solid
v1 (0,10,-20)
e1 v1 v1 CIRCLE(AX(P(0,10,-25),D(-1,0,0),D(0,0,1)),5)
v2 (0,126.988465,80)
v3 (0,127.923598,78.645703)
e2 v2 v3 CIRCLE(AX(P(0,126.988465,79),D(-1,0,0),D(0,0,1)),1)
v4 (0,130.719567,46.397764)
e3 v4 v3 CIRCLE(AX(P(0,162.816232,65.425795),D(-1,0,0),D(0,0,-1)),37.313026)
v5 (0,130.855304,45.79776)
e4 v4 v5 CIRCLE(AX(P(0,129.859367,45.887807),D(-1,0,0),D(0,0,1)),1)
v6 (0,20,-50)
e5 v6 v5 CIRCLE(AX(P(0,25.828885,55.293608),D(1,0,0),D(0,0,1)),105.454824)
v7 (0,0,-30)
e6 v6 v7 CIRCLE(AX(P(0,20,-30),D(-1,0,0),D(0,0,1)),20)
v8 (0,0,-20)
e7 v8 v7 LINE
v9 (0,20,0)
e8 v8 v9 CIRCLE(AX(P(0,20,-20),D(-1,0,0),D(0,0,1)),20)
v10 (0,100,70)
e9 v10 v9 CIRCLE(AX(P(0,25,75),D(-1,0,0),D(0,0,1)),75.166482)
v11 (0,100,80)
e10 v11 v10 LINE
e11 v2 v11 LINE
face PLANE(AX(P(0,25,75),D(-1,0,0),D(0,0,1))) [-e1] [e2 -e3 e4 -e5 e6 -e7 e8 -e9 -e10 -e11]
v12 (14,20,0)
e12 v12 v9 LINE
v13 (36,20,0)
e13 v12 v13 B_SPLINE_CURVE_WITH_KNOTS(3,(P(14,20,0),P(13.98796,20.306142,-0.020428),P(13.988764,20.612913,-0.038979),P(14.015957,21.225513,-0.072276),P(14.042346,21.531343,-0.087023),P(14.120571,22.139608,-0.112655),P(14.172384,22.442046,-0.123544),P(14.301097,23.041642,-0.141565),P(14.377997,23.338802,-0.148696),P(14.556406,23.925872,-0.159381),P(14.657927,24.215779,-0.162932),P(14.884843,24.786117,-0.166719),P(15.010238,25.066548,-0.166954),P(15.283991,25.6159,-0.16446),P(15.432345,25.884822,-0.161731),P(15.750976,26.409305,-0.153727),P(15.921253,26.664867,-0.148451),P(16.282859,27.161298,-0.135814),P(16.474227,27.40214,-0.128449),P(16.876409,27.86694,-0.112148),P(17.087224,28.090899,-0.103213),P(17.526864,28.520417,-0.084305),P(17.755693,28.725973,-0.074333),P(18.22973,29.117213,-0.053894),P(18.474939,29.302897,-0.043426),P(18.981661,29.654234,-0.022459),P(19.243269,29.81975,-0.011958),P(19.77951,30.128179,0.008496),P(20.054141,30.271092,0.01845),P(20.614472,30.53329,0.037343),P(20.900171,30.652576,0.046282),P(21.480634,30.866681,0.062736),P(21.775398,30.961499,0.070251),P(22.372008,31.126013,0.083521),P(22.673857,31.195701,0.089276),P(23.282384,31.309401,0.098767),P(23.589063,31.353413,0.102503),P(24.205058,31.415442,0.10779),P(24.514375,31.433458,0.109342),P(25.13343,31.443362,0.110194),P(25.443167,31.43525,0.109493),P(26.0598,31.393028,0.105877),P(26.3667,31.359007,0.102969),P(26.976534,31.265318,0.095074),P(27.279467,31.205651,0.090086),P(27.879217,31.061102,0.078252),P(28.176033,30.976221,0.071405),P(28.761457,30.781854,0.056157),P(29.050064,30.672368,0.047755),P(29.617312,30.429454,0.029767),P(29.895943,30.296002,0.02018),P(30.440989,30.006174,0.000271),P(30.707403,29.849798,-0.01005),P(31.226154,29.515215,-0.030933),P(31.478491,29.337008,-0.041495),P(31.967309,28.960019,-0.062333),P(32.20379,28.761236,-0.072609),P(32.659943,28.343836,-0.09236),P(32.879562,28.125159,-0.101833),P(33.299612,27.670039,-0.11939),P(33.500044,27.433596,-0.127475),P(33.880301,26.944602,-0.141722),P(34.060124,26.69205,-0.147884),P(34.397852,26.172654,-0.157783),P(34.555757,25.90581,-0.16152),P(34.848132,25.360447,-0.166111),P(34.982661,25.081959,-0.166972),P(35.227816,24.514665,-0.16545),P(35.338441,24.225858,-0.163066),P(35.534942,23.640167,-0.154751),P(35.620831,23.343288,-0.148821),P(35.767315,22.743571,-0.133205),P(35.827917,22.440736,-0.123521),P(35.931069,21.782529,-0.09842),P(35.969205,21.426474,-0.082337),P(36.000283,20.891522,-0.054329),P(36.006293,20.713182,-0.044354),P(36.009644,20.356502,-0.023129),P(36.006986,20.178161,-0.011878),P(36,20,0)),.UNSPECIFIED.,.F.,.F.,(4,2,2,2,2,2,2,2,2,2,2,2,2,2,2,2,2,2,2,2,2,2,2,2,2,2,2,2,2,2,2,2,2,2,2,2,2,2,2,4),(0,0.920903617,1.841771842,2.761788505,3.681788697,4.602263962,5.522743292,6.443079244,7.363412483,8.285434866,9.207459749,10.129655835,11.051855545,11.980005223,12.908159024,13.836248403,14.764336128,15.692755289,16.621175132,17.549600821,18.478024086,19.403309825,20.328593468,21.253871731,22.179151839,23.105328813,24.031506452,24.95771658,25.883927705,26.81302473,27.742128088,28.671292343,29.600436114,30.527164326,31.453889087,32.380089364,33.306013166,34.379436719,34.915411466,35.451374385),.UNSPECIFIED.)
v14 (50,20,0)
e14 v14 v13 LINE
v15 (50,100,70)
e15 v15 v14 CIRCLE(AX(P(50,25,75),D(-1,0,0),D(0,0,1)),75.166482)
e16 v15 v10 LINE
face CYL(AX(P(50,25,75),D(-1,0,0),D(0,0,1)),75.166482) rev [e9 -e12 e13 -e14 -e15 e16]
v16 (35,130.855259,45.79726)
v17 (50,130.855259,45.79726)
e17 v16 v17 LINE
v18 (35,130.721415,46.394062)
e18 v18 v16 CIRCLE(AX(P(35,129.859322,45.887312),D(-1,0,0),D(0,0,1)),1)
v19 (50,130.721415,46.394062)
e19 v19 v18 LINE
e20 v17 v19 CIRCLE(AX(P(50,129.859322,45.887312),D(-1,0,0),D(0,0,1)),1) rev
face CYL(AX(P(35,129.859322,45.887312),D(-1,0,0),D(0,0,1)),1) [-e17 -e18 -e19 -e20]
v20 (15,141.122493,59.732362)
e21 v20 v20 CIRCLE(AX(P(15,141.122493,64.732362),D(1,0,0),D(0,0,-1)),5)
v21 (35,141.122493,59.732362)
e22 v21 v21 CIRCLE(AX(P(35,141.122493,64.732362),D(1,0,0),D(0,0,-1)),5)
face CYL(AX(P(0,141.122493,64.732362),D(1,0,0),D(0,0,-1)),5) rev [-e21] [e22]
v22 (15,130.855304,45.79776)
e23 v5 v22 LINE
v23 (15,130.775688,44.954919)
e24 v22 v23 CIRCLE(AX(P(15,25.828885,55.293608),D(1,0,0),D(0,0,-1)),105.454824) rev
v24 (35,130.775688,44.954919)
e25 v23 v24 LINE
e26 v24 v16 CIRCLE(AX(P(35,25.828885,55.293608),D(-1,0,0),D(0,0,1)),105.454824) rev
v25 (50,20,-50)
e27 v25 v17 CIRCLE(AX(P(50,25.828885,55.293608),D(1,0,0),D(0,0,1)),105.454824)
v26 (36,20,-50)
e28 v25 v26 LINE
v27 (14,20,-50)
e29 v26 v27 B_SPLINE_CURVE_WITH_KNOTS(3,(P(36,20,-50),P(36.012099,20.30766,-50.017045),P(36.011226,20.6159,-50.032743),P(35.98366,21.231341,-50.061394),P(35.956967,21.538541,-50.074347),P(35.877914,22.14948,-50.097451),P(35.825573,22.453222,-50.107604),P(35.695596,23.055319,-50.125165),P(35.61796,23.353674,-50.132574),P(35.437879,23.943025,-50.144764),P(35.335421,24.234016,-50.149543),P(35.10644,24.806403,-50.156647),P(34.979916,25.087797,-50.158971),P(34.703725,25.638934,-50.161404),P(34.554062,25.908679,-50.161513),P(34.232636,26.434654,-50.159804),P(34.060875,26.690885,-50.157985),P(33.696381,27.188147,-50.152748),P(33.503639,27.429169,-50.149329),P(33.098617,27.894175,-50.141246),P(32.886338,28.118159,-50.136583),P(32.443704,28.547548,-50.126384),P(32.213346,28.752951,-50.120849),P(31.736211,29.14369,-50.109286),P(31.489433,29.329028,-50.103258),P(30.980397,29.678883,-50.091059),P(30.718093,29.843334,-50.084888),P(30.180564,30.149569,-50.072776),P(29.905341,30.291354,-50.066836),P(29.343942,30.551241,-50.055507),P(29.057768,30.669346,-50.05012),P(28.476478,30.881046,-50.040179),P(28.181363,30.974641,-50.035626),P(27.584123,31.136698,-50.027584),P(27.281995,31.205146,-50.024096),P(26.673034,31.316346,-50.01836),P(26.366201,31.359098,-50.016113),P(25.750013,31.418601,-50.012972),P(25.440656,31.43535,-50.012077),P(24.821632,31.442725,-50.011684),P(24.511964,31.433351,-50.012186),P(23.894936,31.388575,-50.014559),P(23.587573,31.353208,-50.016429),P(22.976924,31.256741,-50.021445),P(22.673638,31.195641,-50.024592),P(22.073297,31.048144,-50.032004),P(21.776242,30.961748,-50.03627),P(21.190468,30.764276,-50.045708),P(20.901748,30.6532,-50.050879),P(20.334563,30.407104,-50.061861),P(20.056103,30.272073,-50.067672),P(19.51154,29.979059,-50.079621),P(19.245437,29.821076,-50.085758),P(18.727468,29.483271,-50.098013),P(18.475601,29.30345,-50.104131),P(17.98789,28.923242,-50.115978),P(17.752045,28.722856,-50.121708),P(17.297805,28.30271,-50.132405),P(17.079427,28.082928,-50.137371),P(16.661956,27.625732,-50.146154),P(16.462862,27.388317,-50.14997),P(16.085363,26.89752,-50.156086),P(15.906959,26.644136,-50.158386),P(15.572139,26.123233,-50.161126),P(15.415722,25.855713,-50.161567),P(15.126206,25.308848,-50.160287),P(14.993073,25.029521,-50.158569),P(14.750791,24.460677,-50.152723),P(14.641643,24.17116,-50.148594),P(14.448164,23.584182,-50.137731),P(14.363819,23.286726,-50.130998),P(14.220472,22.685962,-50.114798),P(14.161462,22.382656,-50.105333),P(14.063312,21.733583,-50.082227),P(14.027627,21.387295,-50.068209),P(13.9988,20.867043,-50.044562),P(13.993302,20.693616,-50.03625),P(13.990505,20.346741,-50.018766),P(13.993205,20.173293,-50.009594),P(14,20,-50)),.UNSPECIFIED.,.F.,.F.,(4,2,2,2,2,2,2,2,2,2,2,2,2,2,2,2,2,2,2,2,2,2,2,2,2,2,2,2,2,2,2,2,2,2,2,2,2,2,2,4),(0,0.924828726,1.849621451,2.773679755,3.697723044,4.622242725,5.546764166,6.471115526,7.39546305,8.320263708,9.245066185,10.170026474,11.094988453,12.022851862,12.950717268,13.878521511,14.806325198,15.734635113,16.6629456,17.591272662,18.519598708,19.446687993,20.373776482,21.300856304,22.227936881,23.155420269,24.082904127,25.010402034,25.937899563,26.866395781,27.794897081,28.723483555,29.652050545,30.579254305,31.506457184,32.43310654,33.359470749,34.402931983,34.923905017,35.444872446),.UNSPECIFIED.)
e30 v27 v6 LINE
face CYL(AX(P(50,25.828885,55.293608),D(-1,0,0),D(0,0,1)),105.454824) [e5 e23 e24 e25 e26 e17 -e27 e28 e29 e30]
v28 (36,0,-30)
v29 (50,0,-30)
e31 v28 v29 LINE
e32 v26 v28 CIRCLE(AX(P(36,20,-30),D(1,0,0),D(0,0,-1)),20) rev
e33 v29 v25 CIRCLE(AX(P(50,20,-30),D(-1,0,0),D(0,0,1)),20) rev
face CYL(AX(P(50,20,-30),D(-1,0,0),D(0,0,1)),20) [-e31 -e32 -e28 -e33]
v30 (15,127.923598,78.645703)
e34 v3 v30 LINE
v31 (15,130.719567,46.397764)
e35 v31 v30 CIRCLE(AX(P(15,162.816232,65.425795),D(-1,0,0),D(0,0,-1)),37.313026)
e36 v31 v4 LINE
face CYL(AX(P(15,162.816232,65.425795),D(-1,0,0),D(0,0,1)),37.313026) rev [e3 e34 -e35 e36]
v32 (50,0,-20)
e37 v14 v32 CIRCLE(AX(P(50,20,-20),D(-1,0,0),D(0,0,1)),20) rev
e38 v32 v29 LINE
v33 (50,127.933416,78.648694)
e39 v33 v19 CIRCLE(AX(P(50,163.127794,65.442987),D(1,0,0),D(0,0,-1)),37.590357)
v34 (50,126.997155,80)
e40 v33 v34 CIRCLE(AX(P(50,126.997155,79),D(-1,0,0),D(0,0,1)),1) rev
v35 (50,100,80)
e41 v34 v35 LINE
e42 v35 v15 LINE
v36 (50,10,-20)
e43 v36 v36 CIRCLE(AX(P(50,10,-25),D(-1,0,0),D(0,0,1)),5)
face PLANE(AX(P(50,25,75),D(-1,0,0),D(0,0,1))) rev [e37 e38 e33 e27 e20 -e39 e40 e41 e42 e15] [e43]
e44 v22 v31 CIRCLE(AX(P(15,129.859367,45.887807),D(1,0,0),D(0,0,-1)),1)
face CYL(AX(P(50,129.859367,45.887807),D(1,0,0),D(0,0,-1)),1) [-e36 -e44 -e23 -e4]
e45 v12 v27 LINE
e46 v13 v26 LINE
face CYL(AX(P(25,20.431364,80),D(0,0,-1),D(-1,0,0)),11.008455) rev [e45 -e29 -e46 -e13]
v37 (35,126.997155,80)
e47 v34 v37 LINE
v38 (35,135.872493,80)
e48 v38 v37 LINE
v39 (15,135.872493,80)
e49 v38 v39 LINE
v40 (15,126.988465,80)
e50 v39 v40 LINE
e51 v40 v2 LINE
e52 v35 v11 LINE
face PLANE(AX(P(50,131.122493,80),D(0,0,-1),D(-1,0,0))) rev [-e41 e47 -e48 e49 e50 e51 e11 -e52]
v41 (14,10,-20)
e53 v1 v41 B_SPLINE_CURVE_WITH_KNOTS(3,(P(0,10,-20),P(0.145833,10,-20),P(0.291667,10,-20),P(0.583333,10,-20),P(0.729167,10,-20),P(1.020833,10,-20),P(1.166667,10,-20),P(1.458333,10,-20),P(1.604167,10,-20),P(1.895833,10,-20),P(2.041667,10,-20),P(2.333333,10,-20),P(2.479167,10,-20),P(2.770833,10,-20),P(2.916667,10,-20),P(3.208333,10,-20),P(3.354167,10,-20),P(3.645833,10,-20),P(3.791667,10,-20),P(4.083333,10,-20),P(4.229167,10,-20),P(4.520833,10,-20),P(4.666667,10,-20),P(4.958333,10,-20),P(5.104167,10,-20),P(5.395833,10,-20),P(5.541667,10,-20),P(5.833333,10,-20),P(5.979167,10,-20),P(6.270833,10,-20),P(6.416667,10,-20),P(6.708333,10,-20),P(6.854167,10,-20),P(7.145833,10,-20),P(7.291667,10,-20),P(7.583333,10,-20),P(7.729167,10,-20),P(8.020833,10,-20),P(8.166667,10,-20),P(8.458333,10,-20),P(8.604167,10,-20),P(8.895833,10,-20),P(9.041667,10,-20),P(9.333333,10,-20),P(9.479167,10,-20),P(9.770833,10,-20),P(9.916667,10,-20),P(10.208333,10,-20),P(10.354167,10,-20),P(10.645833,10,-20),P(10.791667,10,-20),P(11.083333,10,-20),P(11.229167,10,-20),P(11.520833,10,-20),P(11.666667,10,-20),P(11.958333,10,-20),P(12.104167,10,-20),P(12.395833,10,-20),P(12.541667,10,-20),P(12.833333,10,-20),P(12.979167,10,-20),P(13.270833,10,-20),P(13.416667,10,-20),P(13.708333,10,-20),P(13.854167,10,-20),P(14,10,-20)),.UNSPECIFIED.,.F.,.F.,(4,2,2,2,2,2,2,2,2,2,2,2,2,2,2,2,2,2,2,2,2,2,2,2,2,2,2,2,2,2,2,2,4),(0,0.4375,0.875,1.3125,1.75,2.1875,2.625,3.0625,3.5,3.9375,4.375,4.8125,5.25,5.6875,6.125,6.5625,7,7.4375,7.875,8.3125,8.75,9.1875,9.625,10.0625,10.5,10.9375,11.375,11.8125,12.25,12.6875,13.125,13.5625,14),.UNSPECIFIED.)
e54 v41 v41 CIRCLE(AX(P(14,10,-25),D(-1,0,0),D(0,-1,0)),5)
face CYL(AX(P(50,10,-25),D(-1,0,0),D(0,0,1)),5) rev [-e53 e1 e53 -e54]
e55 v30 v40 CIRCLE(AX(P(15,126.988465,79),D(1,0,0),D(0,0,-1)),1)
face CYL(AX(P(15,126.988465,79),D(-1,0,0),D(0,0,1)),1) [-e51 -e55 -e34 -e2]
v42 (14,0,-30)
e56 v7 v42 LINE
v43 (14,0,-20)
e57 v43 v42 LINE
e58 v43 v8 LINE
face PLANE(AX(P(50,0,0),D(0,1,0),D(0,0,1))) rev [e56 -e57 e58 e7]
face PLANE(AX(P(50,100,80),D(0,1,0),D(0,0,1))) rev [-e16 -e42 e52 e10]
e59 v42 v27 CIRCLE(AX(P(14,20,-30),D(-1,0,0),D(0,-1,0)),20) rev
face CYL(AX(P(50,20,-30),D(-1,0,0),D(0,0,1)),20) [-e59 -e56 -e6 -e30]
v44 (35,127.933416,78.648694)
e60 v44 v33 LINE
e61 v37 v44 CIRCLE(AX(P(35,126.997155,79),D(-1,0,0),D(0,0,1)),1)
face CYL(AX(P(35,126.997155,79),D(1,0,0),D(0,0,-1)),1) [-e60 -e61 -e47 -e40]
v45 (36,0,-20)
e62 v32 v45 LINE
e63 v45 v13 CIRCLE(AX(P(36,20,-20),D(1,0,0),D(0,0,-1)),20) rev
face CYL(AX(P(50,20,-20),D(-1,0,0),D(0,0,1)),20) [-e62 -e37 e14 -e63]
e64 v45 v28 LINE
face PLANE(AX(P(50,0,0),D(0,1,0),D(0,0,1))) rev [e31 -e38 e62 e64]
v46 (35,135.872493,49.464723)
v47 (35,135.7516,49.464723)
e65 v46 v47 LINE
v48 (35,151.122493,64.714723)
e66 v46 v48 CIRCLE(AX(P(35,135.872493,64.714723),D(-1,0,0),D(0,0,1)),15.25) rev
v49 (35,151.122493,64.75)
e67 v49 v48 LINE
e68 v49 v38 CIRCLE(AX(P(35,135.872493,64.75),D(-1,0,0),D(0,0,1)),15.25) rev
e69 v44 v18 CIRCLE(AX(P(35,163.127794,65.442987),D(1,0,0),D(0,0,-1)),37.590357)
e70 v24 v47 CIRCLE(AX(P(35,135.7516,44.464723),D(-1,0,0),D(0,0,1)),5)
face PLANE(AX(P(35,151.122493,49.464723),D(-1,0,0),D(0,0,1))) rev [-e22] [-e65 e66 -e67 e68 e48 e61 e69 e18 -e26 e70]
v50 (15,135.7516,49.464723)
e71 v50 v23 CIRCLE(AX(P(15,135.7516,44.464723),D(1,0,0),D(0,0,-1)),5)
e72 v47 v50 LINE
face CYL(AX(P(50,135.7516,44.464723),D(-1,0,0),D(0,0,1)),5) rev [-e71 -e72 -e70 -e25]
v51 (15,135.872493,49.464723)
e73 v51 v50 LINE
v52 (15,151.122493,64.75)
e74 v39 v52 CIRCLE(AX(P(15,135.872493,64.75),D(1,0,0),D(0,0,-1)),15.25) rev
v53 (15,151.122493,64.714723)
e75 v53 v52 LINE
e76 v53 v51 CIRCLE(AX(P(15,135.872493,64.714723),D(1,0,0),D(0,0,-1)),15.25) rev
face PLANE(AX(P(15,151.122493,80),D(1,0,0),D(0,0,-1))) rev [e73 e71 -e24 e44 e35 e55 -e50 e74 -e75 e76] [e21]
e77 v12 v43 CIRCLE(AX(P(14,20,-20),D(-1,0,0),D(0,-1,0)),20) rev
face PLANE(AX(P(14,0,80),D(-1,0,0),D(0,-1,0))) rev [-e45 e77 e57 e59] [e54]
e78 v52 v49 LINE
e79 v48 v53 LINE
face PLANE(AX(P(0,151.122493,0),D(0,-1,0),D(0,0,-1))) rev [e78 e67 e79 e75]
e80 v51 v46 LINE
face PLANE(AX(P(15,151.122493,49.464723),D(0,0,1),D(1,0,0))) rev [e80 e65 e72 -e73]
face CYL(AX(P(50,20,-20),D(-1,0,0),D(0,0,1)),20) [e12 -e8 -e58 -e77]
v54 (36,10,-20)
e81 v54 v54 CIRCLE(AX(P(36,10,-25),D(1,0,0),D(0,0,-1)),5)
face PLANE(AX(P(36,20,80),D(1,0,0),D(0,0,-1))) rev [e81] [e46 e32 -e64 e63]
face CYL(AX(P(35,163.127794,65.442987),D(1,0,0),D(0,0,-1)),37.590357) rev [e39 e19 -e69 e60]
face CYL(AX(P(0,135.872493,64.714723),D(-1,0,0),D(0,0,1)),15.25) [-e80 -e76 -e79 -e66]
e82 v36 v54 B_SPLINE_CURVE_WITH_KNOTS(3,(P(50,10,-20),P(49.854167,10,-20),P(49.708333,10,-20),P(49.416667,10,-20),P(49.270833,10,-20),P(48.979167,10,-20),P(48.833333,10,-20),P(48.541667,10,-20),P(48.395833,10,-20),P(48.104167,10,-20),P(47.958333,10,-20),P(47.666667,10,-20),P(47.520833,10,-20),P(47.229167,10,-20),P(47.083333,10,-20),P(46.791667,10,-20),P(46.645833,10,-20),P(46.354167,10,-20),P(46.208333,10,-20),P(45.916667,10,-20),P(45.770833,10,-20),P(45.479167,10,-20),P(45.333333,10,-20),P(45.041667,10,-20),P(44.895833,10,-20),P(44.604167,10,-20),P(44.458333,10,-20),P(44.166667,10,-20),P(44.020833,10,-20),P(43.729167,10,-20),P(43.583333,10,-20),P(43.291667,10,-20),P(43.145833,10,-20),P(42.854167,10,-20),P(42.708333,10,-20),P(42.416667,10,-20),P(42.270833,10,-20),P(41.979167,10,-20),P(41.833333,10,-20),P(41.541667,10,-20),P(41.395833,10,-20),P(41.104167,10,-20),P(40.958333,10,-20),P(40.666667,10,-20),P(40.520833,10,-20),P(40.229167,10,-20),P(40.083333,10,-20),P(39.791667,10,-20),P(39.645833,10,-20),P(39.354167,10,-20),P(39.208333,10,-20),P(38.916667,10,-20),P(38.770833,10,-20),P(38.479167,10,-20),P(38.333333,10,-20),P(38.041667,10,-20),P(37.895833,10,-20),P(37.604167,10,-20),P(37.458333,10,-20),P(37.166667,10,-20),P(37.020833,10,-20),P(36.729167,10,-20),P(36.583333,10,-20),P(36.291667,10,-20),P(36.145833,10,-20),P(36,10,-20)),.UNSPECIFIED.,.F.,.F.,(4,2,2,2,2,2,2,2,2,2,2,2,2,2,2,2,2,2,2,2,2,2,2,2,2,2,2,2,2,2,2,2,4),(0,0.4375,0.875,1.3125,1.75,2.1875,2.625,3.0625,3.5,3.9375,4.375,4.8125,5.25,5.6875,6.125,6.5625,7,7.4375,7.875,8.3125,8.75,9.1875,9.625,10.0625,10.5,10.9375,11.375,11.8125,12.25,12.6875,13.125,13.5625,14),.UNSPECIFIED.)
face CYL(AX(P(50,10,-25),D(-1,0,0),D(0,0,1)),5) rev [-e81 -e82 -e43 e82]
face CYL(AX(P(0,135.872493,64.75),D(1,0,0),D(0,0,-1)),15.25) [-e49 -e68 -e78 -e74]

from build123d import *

# Parameters (mm, degrees)
BOSS_EXTRUDE1_DEPTH     = 50
SKETCH3_W               = 22
SKETCH3_H               = 20
CUT_EXTRUDE2_DEPTH      = 192.293252092
CUT_EXTRUDE3_DEPTH      = 158.762822921
CUT_EXTRUDE3_DEPTH_BACK = 158.762822921
SKETCH4_R               = 5
FILLET3_R               = 20
CUT_EXTRUDE4_DEPTH      = 162.533613518
CUT_EXTRUDE4_DEPTH_BACK = 162.533613518
SKETCH6_W               = 20
SKETCH6_H               = 30.53527662
BOSS_EXTRUDE2_DEPTH     = 20
SKETCH7_R               = 5
CUT_EXTRUDE5_DEPTH      = 175.536552167
FILLET4_R               = 15.25
FILLET8_R               = 5
CUT_EXTRUDE7_START      = -15
CUT_EXTRUDE7_DEPTH      = 15
CUT_EXTRUDE8_DEPTH      = 15
FILLET13_R              = 1


with BuildPart() as part:
    # Sketch2 → Boss-Extrude1 (new body)
    with BuildSketch(Plane(origin=(0, 0, 0), x_dir=(0, 0, -1), z_dir=(1, 0, 0))):
        with BuildLine():
            Line((0, 0), (50, 0))
            Line((50, 0), (50, 20))
            ThreePointArc((50, 20), (23.281860252, 96.16106544), (-49.46472338, 131.122493479))
            Line((-49.46472338, 131.122493479), (-80, 131.122493479))
            Line((-80, 131.122493479), (-80, 100))
            Line((-80, 100), (-70, 100))
            ThreePointArc((-70, 100), (-18.431457505, 74.497474683), (0, 20))
            Line((0, 20), (0, 0))
        make_face()
    extrude(amount=BOSS_EXTRUDE1_DEPTH)

    # Sketch3 → Cut-Extrude2 (cut, through all)
    with BuildSketch(Plane(origin=(0, 0, -50), x_dir=(-1, 0, 0), z_dir=(0, 0, -1))):
        with Locations((-25, 10)):
            Rectangle(SKETCH3_W, SKETCH3_H)
    extrude(amount=-CUT_EXTRUDE2_DEPTH, mode=Mode.SUBTRACT)

    # Sketch4 → Cut-Extrude3 (cut, two sides: drawn at the far end of the back side and taken through both)
    with BuildSketch(Plane.ZY.offset(-36).offset(-CUT_EXTRUDE3_DEPTH_BACK)):
        with Locations((-25, 10)):
            Circle(SKETCH4_R)
    extrude(amount=CUT_EXTRUDE3_DEPTH + CUT_EXTRUDE3_DEPTH_BACK, mode=Mode.SUBTRACT)

    # Fillet3
    fillet3_edges = [part.edges().sort_by_distance(p)[0] for p in [
        (7, 0, 0),
        (7, 0, -50),
        (43, 0, 0),
        (43, 0, -50),
    ]]
    fillet(fillet3_edges, radius=FILLET3_R - 0.0001)  # a hair under: the kernel refuses the full size

    # Sketch5 → Cut-Extrude4 (cut, two sides: drawn at the far end of the back side and taken through both)
    with BuildSketch(Plane(origin=(0, 0, 0), x_dir=(-1, 0, 0), z_dir=(0, 0, -1)).offset(-CUT_EXTRUDE4_DEPTH_BACK)):
        with BuildLine():
            Line((-36, 20), (-14, 20))
            ThreePointArc((-14, 20), (-25, 31.439818902), (-36, 20))
        make_face()
    extrude(amount=CUT_EXTRUDE4_DEPTH + CUT_EXTRUDE4_DEPTH_BACK, mode=Mode.SUBTRACT)

    # Sketch6 → Boss-Extrude2 (add)
    with BuildSketch(Plane(origin=(0, 131.122493479, 0), x_dir=(1, 0, 0), z_dir=(0, 1, 0))):
        with Locations((25, -64.73236169)):
            Rectangle(SKETCH6_W, SKETCH6_H)
    extrude(amount=BOSS_EXTRUDE2_DEPTH)

    # Sketch7 → Cut-Extrude5 (cut, through all)
    with BuildSketch(Plane(origin=(35, 0, 0), x_dir=(0, 0, -1), z_dir=(1, 0, 0))):
        with Locations((-64.73236169, 141.122493479)):
            Circle(SKETCH7_R)
    extrude(amount=-CUT_EXTRUDE5_DEPTH, mode=Mode.SUBTRACT)

    # Fillet4
    fillet4_edges = [part.edges().sort_by_distance(p)[0] for p in [
        (25, 151.122493479, 80),
        (25, 151.122493479, 49.46472338),
    ]]
    fillet(fillet4_edges, radius=FILLET4_R)

    # Fillet8
    fillet8_edges = [part.edges().sort_by_distance(p)[0] for p in [
        (25, 131.122493479, 49.46472338),
    ]]
    fillet(fillet8_edges, radius=FILLET8_R)

    # Sketch8 → Cut-Extrude7 (cut)
    with BuildSketch(Plane(origin=(50, 0, 0), x_dir=(0, 0, -1), z_dir=(1, 0, 0)).offset(CUT_EXTRUDE7_START)):
        with BuildLine():
            Line((-80, 128.470495387), (-80, 131.122493479))
            Line((-80, 131.122493479), (-49.46472338, 131.122493479))
            ThreePointArc((-49.46472338, 131.122493479), (-47.791514438, 131.016519602), (-46.120201716, 130.883958636))
            ThreePointArc((-46.120201716, 130.883958636), (-62.771967085, 125.632452712), (-80, 128.470495387))
        make_face()
    extrude(amount=CUT_EXTRUDE7_DEPTH, mode=Mode.SUBTRACT)

    # Sketch9 → Cut-Extrude8 (cut)
    with BuildSketch(Plane.ZY):
        with BuildLine():
            Line((80, 128.467222993), (80, 131.122493479))
            Line((80, 131.122493479), (49.46472338, 131.122493479))
            ThreePointArc((49.46472338, 131.122493479), (47.79280742, 131.016611811), (46.122784424, 130.884184126))
            ThreePointArc((46.122784424, 130.884184126), (62.770455841, 125.597808373), (80, 128.467222993))
        make_face()
    extrude(amount=-CUT_EXTRUDE8_DEPTH, mode=Mode.SUBTRACT)

    # Fillet13
    fillet13_edges = [part.edges().sort_by_distance(p)[0] for p in [
        (42.5, 130.883958636, 46.120201716),
        (42.5, 128.470495387, 80),
        (7.5, 128.467222993, 80),
        (7.5, 130.884184126, 46.122784424),
    ]]
    fillet(fillet13_edges, radius=FILLET13_R)


solid = part.part
